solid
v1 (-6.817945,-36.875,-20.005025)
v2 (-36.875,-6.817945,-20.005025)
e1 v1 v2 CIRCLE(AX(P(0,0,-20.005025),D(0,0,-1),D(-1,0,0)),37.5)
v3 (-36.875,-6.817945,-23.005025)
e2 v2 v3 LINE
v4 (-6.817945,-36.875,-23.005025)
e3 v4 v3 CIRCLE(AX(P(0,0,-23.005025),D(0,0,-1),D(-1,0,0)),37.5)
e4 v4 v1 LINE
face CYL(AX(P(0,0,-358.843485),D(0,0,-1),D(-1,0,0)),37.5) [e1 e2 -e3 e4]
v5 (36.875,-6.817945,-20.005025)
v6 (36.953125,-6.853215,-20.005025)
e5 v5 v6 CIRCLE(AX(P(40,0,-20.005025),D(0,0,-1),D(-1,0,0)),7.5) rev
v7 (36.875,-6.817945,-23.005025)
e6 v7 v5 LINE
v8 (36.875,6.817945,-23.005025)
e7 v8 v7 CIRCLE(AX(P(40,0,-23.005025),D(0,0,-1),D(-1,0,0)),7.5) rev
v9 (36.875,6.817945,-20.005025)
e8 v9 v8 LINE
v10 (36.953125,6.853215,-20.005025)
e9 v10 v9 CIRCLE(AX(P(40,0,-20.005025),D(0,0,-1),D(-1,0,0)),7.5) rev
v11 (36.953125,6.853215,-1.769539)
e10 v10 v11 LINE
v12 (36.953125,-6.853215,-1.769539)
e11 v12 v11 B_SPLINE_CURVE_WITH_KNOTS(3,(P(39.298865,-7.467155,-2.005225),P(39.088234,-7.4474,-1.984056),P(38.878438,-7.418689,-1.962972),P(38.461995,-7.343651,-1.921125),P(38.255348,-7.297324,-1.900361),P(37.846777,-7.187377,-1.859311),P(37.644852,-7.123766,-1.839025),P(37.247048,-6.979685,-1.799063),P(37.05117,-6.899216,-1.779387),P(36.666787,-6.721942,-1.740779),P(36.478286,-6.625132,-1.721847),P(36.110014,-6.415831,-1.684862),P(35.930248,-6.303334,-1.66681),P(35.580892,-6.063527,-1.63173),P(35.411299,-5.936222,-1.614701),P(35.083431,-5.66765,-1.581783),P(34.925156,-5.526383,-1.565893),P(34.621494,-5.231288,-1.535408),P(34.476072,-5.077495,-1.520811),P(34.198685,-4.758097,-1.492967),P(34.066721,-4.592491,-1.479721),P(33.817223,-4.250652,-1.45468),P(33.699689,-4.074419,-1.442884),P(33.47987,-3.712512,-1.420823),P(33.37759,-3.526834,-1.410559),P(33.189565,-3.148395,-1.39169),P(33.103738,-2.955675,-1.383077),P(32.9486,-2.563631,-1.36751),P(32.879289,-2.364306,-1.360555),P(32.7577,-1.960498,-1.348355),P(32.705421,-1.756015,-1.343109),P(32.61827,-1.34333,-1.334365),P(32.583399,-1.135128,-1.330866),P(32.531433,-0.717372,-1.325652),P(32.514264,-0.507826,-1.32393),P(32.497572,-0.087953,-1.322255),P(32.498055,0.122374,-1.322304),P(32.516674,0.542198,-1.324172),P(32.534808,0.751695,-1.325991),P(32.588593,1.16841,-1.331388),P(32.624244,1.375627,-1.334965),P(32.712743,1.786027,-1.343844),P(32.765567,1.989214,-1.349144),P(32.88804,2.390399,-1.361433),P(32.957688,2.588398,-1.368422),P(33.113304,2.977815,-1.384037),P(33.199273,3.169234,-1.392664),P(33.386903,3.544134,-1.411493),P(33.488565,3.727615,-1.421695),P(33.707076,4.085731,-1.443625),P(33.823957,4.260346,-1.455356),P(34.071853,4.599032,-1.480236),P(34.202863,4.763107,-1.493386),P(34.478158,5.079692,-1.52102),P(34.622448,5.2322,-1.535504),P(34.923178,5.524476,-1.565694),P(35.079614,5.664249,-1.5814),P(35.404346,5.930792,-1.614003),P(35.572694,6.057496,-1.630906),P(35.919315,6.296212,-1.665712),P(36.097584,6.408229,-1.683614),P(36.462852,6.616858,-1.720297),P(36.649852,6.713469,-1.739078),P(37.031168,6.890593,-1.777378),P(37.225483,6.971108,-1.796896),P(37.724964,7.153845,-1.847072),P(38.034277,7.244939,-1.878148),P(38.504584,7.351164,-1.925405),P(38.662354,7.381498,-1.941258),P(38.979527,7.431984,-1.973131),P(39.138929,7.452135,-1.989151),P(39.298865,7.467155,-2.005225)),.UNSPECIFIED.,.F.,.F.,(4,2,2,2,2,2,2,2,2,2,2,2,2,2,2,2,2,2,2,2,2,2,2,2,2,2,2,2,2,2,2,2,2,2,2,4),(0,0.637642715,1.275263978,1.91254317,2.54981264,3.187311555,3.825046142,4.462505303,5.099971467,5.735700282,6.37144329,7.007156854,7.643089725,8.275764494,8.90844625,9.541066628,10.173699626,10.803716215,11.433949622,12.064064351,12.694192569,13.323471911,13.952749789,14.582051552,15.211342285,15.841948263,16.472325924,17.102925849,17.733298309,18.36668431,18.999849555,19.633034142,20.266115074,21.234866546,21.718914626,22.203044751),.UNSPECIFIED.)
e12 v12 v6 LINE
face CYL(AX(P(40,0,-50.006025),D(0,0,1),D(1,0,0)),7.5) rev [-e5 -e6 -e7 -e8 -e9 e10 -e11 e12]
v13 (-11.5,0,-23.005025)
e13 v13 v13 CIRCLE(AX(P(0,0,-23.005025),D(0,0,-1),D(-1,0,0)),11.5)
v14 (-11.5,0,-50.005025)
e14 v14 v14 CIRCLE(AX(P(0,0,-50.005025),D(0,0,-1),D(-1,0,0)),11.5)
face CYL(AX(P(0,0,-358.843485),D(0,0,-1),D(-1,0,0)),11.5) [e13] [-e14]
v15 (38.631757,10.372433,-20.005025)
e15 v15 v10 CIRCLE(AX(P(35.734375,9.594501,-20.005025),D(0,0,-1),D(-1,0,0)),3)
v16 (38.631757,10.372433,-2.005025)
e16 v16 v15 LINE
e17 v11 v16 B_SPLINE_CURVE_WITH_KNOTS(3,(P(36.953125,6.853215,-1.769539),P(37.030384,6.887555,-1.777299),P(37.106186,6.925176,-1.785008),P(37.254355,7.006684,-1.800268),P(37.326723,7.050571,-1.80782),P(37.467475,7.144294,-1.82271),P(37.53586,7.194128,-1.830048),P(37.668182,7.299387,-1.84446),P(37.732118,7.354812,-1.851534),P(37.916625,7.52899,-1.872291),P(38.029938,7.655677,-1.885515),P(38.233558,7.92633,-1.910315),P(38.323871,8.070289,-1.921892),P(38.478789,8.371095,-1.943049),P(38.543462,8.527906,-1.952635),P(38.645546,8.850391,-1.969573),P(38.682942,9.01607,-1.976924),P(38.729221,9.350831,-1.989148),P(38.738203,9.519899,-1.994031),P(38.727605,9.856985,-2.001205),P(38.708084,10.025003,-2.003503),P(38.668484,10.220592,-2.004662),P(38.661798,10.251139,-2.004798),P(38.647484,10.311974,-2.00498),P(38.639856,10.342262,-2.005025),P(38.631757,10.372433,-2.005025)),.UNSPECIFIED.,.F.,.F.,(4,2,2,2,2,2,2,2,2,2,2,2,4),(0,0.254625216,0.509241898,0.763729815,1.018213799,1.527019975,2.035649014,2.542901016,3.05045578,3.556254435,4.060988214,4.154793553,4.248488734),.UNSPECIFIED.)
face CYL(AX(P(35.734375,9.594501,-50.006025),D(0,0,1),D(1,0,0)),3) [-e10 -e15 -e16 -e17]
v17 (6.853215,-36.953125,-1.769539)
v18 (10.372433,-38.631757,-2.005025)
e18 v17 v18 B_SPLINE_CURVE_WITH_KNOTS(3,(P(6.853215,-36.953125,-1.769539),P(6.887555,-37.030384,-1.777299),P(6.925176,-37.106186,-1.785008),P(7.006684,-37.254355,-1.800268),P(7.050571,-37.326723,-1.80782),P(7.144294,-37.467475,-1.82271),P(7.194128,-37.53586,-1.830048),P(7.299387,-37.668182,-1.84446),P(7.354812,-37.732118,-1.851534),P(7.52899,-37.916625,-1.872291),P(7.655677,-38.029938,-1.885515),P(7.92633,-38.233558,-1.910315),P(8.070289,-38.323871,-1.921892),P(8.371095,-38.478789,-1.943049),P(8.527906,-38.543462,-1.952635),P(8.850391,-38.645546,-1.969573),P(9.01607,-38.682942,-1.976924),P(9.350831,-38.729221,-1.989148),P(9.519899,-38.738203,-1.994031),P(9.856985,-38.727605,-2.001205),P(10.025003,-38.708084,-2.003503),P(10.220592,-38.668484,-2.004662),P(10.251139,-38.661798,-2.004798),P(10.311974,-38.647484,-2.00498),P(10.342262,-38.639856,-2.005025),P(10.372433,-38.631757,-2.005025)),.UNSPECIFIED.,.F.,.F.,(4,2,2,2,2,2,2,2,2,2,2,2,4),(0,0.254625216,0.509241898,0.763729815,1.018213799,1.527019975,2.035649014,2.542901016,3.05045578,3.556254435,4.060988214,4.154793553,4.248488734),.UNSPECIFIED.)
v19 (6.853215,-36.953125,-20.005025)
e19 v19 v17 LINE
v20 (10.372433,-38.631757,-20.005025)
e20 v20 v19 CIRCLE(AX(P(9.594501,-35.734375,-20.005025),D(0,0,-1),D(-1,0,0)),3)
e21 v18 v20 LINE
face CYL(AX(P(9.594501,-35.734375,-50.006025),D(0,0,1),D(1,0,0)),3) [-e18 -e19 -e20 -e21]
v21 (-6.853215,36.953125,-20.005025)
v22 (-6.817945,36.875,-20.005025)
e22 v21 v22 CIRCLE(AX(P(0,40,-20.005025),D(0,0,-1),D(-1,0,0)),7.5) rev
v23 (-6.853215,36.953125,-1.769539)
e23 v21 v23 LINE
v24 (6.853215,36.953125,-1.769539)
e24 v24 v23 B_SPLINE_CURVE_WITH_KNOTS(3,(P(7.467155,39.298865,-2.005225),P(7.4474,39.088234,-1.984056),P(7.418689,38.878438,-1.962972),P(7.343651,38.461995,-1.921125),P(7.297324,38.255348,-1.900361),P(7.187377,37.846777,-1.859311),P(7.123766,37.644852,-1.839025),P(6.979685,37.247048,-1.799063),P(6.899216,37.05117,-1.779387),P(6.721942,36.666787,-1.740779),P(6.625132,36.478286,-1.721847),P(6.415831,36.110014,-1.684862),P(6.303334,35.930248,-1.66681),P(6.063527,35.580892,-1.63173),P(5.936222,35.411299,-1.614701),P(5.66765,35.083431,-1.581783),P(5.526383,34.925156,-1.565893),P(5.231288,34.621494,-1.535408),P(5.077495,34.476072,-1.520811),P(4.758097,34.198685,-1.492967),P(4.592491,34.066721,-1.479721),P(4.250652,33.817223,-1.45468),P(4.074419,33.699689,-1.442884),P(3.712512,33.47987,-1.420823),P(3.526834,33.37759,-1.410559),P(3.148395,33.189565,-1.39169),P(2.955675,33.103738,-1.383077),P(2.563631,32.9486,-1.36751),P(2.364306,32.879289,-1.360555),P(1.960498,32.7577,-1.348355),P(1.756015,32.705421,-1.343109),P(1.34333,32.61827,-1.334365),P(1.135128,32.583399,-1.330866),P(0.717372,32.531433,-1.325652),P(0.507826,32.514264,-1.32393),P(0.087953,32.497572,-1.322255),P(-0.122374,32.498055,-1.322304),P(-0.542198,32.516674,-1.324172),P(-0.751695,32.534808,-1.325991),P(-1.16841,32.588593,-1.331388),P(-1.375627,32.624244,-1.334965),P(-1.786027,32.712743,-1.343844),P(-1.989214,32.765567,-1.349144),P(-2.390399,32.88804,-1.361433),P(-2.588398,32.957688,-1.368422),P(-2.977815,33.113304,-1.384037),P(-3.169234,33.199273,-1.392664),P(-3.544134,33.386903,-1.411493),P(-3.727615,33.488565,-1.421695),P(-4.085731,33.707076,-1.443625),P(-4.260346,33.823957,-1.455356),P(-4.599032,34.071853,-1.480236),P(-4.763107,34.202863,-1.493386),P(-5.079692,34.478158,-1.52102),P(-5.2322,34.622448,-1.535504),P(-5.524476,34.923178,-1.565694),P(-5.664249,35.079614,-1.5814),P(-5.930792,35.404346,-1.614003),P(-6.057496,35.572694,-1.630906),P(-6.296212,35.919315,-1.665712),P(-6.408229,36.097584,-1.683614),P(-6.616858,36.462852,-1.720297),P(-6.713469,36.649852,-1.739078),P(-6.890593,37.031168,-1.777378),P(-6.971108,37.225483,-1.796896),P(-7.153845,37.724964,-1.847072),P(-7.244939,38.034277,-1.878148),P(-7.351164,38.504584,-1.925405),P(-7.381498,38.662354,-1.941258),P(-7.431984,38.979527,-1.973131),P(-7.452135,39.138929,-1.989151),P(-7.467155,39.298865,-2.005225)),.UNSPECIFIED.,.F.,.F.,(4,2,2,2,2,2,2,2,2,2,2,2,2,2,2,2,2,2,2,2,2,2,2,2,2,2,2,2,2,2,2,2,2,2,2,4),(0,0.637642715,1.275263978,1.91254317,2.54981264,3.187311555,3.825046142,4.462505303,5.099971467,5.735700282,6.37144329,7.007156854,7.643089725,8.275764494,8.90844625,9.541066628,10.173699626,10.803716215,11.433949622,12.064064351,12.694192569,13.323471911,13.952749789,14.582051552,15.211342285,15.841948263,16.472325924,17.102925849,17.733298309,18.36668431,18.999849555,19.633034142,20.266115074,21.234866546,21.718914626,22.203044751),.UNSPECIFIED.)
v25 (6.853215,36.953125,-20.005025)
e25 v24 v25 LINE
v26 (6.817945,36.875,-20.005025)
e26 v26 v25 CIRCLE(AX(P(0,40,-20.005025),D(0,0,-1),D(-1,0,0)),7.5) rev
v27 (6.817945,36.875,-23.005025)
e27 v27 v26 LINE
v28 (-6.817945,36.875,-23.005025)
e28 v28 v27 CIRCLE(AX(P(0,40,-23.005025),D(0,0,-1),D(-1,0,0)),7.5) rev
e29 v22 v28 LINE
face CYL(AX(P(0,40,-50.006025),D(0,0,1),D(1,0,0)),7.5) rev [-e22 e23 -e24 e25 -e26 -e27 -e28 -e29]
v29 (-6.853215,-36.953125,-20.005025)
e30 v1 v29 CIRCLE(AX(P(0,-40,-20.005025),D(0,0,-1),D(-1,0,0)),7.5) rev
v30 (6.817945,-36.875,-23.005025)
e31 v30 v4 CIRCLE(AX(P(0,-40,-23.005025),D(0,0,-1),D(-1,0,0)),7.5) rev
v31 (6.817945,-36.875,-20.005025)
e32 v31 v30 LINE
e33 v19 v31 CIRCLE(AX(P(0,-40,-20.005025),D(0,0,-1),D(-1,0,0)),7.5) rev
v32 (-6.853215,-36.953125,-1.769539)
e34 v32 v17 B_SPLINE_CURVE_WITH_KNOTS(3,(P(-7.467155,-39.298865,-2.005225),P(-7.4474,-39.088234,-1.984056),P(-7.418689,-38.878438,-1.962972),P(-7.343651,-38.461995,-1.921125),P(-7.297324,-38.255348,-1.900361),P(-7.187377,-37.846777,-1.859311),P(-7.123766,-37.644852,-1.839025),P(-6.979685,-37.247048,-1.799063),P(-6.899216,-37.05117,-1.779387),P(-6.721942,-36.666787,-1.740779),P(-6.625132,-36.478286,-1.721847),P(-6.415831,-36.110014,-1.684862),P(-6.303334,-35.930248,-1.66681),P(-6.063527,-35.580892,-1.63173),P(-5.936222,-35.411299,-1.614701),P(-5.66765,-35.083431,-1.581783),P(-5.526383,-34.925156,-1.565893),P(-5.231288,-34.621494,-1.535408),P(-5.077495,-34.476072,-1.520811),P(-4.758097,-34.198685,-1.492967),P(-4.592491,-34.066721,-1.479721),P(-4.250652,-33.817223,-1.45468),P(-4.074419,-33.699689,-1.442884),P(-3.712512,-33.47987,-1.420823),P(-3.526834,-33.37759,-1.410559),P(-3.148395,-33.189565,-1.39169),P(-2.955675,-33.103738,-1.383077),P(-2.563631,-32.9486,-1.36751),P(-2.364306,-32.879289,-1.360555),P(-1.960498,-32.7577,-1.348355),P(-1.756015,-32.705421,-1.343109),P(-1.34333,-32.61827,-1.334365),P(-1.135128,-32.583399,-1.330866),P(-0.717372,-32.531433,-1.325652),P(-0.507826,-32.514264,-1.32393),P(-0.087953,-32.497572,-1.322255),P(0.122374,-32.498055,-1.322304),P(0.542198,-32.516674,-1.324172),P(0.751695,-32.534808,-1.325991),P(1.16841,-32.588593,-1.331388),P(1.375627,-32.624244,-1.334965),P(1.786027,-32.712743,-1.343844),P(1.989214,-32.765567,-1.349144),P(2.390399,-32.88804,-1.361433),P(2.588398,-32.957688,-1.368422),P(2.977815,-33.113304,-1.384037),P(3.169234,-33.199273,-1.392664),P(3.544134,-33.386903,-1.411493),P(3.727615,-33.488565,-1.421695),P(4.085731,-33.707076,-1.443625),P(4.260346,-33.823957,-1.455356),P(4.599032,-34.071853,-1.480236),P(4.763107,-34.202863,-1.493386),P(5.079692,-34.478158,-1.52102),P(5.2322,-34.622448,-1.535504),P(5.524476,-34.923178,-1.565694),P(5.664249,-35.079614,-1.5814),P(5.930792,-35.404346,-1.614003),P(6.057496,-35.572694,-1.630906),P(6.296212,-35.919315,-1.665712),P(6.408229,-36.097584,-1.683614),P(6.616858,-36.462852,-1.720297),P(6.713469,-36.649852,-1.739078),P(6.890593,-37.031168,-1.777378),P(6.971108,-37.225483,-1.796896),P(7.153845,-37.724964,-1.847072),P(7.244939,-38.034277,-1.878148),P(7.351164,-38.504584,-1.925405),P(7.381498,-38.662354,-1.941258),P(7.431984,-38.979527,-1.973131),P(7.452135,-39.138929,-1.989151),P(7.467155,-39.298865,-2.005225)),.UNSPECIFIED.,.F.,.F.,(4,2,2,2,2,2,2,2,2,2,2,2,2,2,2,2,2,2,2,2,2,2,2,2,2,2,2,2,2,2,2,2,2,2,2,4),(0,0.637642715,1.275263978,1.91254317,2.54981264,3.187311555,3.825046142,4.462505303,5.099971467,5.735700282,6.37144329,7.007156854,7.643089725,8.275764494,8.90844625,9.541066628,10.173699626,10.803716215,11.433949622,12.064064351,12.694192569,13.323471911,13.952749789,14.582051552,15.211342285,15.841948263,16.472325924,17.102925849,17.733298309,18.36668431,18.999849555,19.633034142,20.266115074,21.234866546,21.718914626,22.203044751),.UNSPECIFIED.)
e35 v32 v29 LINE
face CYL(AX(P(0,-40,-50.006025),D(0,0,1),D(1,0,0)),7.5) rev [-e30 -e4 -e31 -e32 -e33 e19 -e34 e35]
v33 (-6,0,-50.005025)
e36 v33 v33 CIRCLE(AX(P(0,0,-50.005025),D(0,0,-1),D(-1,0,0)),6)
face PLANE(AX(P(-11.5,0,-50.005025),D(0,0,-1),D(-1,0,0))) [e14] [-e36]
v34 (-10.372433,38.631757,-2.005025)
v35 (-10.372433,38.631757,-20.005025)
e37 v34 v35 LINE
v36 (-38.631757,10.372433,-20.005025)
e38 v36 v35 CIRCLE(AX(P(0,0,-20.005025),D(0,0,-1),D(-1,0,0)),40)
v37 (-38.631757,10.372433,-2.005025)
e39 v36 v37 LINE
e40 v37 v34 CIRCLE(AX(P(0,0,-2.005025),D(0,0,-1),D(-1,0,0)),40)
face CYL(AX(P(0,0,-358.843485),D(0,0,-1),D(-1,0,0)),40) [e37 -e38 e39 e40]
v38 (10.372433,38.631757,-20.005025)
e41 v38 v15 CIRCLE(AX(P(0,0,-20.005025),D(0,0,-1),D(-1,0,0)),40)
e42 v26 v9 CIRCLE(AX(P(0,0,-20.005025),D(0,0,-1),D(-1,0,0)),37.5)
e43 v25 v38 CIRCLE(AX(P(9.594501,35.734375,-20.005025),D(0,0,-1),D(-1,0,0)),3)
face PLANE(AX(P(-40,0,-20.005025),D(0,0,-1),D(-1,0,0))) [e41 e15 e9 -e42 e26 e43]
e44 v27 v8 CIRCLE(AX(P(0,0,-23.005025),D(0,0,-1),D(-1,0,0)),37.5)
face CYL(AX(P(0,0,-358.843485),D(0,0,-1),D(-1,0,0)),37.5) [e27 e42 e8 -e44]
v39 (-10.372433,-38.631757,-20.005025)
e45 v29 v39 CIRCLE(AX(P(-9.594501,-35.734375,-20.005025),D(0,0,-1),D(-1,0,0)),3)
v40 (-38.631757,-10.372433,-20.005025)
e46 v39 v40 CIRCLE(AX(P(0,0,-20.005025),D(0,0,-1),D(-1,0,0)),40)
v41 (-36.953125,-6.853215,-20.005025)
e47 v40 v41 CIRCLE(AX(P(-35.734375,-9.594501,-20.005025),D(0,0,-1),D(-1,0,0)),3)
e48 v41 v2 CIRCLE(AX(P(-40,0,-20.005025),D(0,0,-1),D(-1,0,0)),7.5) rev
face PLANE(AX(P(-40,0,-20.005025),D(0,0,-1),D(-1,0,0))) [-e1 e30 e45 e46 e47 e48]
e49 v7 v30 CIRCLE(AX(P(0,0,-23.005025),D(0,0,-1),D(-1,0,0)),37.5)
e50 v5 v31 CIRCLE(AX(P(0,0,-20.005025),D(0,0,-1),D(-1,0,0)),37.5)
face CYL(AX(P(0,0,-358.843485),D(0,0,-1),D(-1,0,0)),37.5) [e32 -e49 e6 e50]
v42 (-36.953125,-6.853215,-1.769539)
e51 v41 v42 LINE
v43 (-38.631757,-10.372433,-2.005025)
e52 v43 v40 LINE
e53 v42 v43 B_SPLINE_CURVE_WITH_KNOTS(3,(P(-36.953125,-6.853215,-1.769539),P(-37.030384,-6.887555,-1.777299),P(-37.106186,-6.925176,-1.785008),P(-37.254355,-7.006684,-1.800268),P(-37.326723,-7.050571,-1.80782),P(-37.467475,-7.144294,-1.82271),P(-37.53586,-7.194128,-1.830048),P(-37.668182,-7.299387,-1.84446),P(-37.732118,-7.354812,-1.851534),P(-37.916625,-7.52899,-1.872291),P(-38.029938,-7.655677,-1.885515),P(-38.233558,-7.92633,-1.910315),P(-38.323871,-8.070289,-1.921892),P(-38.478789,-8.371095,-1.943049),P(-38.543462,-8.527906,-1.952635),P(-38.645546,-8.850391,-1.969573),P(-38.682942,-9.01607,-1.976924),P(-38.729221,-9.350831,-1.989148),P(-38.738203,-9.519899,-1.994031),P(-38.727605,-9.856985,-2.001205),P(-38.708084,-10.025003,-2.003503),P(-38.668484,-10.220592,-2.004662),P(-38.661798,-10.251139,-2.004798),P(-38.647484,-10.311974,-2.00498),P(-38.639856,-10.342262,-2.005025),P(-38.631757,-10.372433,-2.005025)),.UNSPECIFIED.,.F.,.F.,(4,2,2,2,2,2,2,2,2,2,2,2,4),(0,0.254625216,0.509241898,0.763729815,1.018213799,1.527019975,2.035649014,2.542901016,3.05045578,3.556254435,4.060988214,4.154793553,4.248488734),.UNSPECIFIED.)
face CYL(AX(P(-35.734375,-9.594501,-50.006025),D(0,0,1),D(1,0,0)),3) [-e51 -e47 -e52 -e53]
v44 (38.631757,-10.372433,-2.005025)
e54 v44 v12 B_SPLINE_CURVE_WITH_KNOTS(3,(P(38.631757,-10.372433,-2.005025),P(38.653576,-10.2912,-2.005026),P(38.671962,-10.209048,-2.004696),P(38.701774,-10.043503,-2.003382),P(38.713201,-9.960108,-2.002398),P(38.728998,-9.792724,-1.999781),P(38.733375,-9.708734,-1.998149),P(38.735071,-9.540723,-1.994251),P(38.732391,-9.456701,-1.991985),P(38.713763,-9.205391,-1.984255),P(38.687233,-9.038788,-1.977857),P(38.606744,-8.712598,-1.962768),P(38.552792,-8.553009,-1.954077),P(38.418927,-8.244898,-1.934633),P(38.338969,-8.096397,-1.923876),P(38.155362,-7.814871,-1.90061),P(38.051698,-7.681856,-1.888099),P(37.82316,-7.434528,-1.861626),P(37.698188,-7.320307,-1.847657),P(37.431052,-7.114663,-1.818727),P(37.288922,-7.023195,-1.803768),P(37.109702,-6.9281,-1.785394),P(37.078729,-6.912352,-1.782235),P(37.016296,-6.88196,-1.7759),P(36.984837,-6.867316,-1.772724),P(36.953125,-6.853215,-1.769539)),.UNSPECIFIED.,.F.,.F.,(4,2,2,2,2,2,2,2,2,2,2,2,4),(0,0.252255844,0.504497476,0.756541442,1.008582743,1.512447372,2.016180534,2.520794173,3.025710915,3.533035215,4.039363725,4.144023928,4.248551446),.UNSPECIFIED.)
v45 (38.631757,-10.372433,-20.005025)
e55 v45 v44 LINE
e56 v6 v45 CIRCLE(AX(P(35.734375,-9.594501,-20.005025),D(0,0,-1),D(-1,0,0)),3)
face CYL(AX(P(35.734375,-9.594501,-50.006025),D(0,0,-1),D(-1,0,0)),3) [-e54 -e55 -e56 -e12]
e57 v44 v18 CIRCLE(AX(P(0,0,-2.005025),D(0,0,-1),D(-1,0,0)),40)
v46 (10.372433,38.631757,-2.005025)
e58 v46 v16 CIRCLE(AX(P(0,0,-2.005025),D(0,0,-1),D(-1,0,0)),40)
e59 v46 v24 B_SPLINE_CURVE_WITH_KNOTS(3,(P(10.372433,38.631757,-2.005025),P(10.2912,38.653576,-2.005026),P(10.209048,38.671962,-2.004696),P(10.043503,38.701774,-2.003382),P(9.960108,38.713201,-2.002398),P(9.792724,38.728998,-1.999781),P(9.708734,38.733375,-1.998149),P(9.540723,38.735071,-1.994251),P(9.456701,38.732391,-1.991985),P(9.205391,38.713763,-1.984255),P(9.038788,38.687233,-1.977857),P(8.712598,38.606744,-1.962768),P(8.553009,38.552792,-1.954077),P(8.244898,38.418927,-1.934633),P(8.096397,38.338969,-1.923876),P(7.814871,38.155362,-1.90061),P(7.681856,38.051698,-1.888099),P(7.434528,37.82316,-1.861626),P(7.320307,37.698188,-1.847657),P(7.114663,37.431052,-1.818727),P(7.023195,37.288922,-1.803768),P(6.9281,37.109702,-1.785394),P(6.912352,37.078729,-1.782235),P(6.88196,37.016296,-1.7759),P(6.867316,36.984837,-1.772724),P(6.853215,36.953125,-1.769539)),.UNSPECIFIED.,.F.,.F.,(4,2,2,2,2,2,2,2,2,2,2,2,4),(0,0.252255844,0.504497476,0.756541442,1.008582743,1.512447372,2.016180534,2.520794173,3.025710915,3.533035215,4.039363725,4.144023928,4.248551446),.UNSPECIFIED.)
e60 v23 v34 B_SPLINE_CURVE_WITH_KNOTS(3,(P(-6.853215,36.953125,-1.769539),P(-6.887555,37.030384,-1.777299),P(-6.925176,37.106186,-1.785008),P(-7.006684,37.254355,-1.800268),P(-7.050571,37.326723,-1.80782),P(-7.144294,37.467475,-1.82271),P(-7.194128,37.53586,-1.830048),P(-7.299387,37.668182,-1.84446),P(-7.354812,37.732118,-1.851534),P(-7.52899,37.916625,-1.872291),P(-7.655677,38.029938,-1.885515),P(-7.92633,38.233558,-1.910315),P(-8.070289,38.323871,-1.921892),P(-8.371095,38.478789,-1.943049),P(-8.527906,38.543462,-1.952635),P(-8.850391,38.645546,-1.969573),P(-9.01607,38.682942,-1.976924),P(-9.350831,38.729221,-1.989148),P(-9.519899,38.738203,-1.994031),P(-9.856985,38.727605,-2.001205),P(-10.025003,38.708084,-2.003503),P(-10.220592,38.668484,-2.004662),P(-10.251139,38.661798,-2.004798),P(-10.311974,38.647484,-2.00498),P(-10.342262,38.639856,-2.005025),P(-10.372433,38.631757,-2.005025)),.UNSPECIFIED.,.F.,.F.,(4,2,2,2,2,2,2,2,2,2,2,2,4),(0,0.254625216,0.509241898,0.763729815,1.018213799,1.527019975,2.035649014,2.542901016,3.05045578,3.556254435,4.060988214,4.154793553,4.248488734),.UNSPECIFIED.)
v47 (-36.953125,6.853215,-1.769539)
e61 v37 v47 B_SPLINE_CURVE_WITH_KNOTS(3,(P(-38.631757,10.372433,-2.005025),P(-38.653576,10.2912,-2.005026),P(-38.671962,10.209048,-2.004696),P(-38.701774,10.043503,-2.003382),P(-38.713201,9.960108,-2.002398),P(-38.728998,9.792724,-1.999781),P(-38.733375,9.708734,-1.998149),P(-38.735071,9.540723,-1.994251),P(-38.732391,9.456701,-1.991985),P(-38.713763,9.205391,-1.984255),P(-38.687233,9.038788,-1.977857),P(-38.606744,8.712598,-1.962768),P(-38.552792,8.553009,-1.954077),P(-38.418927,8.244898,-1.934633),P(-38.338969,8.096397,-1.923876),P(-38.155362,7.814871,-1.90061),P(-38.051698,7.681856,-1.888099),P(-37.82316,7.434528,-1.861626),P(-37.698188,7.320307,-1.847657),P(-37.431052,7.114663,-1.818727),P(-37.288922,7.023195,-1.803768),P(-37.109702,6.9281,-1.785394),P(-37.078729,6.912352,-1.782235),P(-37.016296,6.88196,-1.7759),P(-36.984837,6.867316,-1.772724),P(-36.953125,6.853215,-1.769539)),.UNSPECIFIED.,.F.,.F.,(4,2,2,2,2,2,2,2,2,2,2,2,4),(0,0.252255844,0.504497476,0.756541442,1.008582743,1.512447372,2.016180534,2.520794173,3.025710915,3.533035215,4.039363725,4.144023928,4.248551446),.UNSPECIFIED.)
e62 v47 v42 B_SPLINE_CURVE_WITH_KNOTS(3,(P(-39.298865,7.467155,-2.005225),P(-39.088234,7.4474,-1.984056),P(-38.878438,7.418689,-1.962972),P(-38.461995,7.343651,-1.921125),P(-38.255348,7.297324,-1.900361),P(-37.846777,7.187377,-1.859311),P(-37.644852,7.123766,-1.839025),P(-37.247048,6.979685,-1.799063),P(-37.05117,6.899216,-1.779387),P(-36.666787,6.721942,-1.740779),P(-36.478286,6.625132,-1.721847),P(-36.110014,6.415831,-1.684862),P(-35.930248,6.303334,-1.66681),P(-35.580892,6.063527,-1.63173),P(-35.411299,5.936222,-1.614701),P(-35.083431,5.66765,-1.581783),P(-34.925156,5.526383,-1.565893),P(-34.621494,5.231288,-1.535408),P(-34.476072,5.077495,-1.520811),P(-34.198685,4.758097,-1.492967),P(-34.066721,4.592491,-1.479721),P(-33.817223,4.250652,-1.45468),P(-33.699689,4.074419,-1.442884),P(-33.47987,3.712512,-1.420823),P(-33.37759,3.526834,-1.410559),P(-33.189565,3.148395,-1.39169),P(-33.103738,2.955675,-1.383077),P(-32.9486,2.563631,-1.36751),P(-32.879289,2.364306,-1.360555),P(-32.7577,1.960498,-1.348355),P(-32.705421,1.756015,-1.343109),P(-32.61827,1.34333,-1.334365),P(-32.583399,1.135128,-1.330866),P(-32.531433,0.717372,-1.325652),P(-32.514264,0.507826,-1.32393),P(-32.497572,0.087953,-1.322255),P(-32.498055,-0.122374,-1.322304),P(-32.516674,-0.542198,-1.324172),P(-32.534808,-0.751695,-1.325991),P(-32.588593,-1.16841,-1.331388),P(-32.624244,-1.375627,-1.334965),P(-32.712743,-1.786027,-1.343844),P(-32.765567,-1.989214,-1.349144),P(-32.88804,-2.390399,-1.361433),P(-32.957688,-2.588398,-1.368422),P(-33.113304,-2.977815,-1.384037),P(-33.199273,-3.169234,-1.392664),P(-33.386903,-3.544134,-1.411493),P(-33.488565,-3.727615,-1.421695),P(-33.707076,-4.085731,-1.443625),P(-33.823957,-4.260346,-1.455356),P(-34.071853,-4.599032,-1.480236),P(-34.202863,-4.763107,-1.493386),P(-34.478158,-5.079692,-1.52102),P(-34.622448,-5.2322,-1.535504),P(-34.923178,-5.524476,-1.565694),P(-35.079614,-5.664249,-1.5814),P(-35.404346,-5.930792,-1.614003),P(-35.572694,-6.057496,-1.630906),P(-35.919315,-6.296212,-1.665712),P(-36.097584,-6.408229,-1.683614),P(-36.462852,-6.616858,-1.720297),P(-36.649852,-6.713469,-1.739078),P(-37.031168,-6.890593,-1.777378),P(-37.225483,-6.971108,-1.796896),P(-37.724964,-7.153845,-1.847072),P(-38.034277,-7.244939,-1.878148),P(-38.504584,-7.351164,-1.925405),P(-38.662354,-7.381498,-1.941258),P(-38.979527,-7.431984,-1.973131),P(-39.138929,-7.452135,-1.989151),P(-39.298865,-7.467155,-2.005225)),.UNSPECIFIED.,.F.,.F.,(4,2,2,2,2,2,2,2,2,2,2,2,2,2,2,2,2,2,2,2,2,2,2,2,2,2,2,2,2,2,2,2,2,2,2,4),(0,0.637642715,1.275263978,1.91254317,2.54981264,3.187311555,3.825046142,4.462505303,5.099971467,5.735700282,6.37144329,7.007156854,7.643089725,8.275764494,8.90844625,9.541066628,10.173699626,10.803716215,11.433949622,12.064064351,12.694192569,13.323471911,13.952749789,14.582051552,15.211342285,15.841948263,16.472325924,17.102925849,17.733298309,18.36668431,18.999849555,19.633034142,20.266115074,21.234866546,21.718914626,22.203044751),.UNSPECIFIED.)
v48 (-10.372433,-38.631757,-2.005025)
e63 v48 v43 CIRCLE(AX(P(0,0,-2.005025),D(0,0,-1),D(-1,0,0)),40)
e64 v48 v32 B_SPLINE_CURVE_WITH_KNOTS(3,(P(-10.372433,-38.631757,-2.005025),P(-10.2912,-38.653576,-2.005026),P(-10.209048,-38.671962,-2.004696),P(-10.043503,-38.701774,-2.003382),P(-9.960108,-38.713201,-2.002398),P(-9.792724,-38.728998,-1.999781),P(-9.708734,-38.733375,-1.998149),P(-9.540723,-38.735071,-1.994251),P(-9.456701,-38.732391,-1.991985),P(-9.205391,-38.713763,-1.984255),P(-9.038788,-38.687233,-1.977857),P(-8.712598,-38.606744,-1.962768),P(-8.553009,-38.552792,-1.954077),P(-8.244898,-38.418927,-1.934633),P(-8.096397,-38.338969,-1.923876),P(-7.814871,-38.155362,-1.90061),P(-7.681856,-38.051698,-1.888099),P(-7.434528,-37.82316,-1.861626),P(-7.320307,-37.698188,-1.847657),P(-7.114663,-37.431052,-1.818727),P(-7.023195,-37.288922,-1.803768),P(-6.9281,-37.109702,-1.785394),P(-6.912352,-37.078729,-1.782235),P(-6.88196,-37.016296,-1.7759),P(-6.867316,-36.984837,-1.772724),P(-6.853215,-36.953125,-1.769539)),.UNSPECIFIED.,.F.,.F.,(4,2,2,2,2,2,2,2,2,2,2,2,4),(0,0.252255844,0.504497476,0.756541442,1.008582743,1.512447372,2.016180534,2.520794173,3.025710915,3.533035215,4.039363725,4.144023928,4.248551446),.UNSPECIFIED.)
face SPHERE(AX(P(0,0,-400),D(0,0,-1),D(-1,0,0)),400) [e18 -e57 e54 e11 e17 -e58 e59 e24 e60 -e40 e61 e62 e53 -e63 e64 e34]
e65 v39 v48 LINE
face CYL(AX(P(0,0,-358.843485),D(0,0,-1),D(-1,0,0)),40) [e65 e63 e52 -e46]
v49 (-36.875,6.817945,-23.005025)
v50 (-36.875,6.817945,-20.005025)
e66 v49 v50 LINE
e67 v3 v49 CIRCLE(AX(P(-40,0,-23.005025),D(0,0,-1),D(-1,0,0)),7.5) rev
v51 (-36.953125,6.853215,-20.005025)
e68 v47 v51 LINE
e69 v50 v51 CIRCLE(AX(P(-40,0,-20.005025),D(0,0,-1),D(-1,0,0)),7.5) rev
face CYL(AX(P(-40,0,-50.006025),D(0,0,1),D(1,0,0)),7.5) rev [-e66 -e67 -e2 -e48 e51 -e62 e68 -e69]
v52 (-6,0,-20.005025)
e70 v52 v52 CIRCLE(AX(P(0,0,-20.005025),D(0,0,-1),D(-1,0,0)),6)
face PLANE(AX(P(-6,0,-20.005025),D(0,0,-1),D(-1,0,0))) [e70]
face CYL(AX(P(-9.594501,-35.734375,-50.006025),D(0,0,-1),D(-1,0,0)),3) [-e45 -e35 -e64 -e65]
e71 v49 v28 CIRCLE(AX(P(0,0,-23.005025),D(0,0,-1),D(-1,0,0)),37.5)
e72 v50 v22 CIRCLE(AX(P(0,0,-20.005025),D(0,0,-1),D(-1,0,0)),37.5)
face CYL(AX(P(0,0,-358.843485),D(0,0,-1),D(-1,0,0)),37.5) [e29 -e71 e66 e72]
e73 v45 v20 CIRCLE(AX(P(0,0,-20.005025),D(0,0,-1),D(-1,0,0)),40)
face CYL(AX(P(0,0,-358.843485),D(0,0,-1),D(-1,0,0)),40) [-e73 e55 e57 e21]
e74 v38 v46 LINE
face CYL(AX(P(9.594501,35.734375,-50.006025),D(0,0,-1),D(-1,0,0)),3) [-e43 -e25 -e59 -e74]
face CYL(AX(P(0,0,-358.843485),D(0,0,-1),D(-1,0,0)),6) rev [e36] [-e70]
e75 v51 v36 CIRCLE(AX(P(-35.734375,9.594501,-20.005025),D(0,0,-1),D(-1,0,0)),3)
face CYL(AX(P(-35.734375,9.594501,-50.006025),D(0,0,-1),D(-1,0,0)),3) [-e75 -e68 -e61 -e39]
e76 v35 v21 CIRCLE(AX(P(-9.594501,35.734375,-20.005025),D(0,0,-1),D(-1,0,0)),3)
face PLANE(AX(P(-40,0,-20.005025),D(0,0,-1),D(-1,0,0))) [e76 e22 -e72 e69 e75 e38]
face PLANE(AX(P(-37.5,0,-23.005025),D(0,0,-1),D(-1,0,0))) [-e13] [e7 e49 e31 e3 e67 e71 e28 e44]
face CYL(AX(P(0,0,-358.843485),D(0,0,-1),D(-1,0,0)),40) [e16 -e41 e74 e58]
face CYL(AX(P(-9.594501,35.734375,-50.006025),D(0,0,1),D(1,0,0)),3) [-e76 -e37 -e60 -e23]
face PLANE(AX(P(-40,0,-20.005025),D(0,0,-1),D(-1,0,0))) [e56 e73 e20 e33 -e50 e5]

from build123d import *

# Parameters (mm, degrees)
CUT_EXTRUDE1_REACH = 77.502
SKETCH2_R          = 7.5
FILLET1_R          = 3


with BuildPart() as part:
    # Sketch1 → Revolve1 (revolve)
    with BuildSketch(Plane(origin=(0, 0, 0), x_dir=(1, 0, 0), z_dir=(0, 1, 0))):
        with BuildLine():
            Line((0, 20.005025157), (0, 0))
            ThreePointArc((0, 0), (-20.025110024, 0.501570756), (-40, 2.005025157))
            Line((-40, 2.005025157), (-40, 20.005025157))
            Line((-40, 20.005025157), (-37.5, 20.005025157))
            Line((-37.5, 20.005025157), (-37.5, 23.005025157))
            Line((-37.5, 23.005025157), (-11.5, 23.005025157))
            Line((-11.5, 23.005025157), (-11.5, 50.005025157))
            Line((-11.5, 50.005025157), (-6, 50.005025157))
            Line((-6, 50.005025157), (-6, 20.005025157))
            Line((-6, 20.005025157), (0, 20.005025157))
        make_face()
    revolve(axis=Axis((0, 0, -358.843484937), (0, 0, 1)))

    # Sketch2 → Cut-Extrude1 (cut, up to next)
    with BuildSketch(Plane.XY, mode=Mode.PRIVATE) as cut_extrude1_sk1:
        with Locations((0, 40)):
            Circle(SKETCH2_R)
    cut_extrude1_tool1 = extrude(cut_extrude1_sk1.sketch, amount=-CUT_EXTRUDE1_REACH, mode=Mode.PRIVATE) & part.part
    # Sketch2 → Cut-Extrude1 (cut, up to next)
    with BuildSketch(Plane.XY, mode=Mode.PRIVATE) as cut_extrude1_sk2:
        with Locations((40, 0)):
            Circle(SKETCH2_R)
    cut_extrude1_tool2 = extrude(cut_extrude1_sk2.sketch, amount=-CUT_EXTRUDE1_REACH, mode=Mode.PRIVATE) & part.part
    # Sketch2 → Cut-Extrude1 (cut, up to next)
    with BuildSketch(Plane.XY, mode=Mode.PRIVATE) as cut_extrude1_sk3:
        with Locations((0, -40)):
            Circle(SKETCH2_R)
    cut_extrude1_tool3 = extrude(cut_extrude1_sk3.sketch, amount=-CUT_EXTRUDE1_REACH, mode=Mode.PRIVATE) & part.part
    # Sketch2 → Cut-Extrude1 (cut, up to next)
    with BuildSketch(Plane.XY, mode=Mode.PRIVATE) as cut_extrude1_sk4:
        with Locations((-40, 0)):
            Circle(SKETCH2_R)
    cut_extrude1_tool4 = extrude(cut_extrude1_sk4.sketch, amount=-CUT_EXTRUDE1_REACH, mode=Mode.PRIVATE) & part.part
    add(cut_extrude1_tool1.solids().sort_by_distance((0, 40, 0))[0], mode=Mode.SUBTRACT)
    add(cut_extrude1_tool2.solids().sort_by_distance((40, 0, 0))[0], mode=Mode.SUBTRACT)
    add(cut_extrude1_tool3.solids().sort_by_distance((0, -40, 0))[0], mode=Mode.SUBTRACT)
    add(cut_extrude1_tool4.solids().sort_by_distance((-40, 0, 0))[0], mode=Mode.SUBTRACT)

    # Fillet1
    # the kernel refuses this fillet: 3 mm, written as the material it takes off along each edge
    with BuildSketch(Plane(origin=(-39.296875, -7.466968276, -27.456580588), x_dir=(0.9673809008255011, 0.25332625745872106, 0), z_dir=(0, 0, 1))) as fillet1_piece_1:
        with BuildLine():
            CenterArc((2.907334637, -2.960609009), FILLET1_R, 99.295051663, 81.059690814)
            ThreePointArc((-0.092607863, -2.979183163), (-0.074063004, -1.488728691), (0, 0))
            ThreePointArc((0, 0), (1.211389432, -0.098477478), (2.422778864, 0))
        make_face()
    extrude(amount=32.903111461, mode=Mode.SUBTRACT)
    with BuildSketch(Plane(origin=(-39.296875, 7.466968276, -27.456580588), x_dir=(0.967380900825501, -0.25332625745872067, 0), z_dir=(0, 0, 1))) as fillet1_piece_2:
        with BuildLine():
            CenterArc((2.907334637, 2.960609009), FILLET1_R, 179.645257523, 81.059690814)
            ThreePointArc((-0.092607863, 2.979183163), (-0.074063004, 1.488728691), (0, 0))
            ThreePointArc((0, 0), (1.211389432, 0.098477478), (2.422778864, 0))
        make_face()
    extrude(amount=32.903110861, mode=Mode.SUBTRACT)
    with BuildSketch(Plane(origin=(7.466968276, -39.296875, -27.456580588), x_dir=(-0.2533262574587217, 0.9673809008255008, 0), z_dir=(0, 0, 1)), Plane(origin=(39.296875, 7.466968276, -27.456580588), x_dir=(-0.9673809008255009, -0.25332625745872134, 0), z_dir=(0, 0, 1)), Plane(origin=(-7.466968276, 39.296875, -27.456580588), x_dir=(0.2533262574587217, -0.9673809008255008, 0), z_dir=(0, 0, 1))) as fillet1_piece_3:
        with BuildLine():
            CenterArc((2.907334637, -2.960609009), FILLET1_R, 99.295051663, 81.059690814)
            ThreePointArc((-0.092607863, -2.979183163), (-0.074063004, -1.488728691), (0, 0))
            ThreePointArc((0, 0), (1.211389432, -0.098477478), (2.422778864, 0))
        make_face()
    extrude(amount=32.903110861, mode=Mode.SUBTRACT)
    with BuildSketch(Plane(origin=(-7.466968276, -39.296875, -27.456580588), x_dir=(-0.974784701688693, 0.22314745204390218, 0), z_dir=(0, 0, 1)), Plane(origin=(39.296875, -7.466968276, -27.456580588), x_dir=(-0.2231474520439016, -0.9747847016886931, 0), z_dir=(0, 0, 1)), Plane(origin=(7.466968276, 39.296875, -27.456580588), x_dir=(0.9747847016886936, -0.22314745204390027, 0), z_dir=(0, 0, 1))) as fillet1_piece_4:
        with BuildLine():
            CenterArc((2.868848841, -2.997917064), FILLET1_R, 87.864792425, 81.059690814)
            ThreePointArc((-0.075275684, -2.421609175), (0.060792092, -1.21386428), (0, 0))
            ThreePointArc((0, 0), (1.490311086, 0.027772481), (2.980622172, 0))
        make_face()
    extrude(amount=32.903110861, mode=Mode.SUBTRACT)


solid = part.part
